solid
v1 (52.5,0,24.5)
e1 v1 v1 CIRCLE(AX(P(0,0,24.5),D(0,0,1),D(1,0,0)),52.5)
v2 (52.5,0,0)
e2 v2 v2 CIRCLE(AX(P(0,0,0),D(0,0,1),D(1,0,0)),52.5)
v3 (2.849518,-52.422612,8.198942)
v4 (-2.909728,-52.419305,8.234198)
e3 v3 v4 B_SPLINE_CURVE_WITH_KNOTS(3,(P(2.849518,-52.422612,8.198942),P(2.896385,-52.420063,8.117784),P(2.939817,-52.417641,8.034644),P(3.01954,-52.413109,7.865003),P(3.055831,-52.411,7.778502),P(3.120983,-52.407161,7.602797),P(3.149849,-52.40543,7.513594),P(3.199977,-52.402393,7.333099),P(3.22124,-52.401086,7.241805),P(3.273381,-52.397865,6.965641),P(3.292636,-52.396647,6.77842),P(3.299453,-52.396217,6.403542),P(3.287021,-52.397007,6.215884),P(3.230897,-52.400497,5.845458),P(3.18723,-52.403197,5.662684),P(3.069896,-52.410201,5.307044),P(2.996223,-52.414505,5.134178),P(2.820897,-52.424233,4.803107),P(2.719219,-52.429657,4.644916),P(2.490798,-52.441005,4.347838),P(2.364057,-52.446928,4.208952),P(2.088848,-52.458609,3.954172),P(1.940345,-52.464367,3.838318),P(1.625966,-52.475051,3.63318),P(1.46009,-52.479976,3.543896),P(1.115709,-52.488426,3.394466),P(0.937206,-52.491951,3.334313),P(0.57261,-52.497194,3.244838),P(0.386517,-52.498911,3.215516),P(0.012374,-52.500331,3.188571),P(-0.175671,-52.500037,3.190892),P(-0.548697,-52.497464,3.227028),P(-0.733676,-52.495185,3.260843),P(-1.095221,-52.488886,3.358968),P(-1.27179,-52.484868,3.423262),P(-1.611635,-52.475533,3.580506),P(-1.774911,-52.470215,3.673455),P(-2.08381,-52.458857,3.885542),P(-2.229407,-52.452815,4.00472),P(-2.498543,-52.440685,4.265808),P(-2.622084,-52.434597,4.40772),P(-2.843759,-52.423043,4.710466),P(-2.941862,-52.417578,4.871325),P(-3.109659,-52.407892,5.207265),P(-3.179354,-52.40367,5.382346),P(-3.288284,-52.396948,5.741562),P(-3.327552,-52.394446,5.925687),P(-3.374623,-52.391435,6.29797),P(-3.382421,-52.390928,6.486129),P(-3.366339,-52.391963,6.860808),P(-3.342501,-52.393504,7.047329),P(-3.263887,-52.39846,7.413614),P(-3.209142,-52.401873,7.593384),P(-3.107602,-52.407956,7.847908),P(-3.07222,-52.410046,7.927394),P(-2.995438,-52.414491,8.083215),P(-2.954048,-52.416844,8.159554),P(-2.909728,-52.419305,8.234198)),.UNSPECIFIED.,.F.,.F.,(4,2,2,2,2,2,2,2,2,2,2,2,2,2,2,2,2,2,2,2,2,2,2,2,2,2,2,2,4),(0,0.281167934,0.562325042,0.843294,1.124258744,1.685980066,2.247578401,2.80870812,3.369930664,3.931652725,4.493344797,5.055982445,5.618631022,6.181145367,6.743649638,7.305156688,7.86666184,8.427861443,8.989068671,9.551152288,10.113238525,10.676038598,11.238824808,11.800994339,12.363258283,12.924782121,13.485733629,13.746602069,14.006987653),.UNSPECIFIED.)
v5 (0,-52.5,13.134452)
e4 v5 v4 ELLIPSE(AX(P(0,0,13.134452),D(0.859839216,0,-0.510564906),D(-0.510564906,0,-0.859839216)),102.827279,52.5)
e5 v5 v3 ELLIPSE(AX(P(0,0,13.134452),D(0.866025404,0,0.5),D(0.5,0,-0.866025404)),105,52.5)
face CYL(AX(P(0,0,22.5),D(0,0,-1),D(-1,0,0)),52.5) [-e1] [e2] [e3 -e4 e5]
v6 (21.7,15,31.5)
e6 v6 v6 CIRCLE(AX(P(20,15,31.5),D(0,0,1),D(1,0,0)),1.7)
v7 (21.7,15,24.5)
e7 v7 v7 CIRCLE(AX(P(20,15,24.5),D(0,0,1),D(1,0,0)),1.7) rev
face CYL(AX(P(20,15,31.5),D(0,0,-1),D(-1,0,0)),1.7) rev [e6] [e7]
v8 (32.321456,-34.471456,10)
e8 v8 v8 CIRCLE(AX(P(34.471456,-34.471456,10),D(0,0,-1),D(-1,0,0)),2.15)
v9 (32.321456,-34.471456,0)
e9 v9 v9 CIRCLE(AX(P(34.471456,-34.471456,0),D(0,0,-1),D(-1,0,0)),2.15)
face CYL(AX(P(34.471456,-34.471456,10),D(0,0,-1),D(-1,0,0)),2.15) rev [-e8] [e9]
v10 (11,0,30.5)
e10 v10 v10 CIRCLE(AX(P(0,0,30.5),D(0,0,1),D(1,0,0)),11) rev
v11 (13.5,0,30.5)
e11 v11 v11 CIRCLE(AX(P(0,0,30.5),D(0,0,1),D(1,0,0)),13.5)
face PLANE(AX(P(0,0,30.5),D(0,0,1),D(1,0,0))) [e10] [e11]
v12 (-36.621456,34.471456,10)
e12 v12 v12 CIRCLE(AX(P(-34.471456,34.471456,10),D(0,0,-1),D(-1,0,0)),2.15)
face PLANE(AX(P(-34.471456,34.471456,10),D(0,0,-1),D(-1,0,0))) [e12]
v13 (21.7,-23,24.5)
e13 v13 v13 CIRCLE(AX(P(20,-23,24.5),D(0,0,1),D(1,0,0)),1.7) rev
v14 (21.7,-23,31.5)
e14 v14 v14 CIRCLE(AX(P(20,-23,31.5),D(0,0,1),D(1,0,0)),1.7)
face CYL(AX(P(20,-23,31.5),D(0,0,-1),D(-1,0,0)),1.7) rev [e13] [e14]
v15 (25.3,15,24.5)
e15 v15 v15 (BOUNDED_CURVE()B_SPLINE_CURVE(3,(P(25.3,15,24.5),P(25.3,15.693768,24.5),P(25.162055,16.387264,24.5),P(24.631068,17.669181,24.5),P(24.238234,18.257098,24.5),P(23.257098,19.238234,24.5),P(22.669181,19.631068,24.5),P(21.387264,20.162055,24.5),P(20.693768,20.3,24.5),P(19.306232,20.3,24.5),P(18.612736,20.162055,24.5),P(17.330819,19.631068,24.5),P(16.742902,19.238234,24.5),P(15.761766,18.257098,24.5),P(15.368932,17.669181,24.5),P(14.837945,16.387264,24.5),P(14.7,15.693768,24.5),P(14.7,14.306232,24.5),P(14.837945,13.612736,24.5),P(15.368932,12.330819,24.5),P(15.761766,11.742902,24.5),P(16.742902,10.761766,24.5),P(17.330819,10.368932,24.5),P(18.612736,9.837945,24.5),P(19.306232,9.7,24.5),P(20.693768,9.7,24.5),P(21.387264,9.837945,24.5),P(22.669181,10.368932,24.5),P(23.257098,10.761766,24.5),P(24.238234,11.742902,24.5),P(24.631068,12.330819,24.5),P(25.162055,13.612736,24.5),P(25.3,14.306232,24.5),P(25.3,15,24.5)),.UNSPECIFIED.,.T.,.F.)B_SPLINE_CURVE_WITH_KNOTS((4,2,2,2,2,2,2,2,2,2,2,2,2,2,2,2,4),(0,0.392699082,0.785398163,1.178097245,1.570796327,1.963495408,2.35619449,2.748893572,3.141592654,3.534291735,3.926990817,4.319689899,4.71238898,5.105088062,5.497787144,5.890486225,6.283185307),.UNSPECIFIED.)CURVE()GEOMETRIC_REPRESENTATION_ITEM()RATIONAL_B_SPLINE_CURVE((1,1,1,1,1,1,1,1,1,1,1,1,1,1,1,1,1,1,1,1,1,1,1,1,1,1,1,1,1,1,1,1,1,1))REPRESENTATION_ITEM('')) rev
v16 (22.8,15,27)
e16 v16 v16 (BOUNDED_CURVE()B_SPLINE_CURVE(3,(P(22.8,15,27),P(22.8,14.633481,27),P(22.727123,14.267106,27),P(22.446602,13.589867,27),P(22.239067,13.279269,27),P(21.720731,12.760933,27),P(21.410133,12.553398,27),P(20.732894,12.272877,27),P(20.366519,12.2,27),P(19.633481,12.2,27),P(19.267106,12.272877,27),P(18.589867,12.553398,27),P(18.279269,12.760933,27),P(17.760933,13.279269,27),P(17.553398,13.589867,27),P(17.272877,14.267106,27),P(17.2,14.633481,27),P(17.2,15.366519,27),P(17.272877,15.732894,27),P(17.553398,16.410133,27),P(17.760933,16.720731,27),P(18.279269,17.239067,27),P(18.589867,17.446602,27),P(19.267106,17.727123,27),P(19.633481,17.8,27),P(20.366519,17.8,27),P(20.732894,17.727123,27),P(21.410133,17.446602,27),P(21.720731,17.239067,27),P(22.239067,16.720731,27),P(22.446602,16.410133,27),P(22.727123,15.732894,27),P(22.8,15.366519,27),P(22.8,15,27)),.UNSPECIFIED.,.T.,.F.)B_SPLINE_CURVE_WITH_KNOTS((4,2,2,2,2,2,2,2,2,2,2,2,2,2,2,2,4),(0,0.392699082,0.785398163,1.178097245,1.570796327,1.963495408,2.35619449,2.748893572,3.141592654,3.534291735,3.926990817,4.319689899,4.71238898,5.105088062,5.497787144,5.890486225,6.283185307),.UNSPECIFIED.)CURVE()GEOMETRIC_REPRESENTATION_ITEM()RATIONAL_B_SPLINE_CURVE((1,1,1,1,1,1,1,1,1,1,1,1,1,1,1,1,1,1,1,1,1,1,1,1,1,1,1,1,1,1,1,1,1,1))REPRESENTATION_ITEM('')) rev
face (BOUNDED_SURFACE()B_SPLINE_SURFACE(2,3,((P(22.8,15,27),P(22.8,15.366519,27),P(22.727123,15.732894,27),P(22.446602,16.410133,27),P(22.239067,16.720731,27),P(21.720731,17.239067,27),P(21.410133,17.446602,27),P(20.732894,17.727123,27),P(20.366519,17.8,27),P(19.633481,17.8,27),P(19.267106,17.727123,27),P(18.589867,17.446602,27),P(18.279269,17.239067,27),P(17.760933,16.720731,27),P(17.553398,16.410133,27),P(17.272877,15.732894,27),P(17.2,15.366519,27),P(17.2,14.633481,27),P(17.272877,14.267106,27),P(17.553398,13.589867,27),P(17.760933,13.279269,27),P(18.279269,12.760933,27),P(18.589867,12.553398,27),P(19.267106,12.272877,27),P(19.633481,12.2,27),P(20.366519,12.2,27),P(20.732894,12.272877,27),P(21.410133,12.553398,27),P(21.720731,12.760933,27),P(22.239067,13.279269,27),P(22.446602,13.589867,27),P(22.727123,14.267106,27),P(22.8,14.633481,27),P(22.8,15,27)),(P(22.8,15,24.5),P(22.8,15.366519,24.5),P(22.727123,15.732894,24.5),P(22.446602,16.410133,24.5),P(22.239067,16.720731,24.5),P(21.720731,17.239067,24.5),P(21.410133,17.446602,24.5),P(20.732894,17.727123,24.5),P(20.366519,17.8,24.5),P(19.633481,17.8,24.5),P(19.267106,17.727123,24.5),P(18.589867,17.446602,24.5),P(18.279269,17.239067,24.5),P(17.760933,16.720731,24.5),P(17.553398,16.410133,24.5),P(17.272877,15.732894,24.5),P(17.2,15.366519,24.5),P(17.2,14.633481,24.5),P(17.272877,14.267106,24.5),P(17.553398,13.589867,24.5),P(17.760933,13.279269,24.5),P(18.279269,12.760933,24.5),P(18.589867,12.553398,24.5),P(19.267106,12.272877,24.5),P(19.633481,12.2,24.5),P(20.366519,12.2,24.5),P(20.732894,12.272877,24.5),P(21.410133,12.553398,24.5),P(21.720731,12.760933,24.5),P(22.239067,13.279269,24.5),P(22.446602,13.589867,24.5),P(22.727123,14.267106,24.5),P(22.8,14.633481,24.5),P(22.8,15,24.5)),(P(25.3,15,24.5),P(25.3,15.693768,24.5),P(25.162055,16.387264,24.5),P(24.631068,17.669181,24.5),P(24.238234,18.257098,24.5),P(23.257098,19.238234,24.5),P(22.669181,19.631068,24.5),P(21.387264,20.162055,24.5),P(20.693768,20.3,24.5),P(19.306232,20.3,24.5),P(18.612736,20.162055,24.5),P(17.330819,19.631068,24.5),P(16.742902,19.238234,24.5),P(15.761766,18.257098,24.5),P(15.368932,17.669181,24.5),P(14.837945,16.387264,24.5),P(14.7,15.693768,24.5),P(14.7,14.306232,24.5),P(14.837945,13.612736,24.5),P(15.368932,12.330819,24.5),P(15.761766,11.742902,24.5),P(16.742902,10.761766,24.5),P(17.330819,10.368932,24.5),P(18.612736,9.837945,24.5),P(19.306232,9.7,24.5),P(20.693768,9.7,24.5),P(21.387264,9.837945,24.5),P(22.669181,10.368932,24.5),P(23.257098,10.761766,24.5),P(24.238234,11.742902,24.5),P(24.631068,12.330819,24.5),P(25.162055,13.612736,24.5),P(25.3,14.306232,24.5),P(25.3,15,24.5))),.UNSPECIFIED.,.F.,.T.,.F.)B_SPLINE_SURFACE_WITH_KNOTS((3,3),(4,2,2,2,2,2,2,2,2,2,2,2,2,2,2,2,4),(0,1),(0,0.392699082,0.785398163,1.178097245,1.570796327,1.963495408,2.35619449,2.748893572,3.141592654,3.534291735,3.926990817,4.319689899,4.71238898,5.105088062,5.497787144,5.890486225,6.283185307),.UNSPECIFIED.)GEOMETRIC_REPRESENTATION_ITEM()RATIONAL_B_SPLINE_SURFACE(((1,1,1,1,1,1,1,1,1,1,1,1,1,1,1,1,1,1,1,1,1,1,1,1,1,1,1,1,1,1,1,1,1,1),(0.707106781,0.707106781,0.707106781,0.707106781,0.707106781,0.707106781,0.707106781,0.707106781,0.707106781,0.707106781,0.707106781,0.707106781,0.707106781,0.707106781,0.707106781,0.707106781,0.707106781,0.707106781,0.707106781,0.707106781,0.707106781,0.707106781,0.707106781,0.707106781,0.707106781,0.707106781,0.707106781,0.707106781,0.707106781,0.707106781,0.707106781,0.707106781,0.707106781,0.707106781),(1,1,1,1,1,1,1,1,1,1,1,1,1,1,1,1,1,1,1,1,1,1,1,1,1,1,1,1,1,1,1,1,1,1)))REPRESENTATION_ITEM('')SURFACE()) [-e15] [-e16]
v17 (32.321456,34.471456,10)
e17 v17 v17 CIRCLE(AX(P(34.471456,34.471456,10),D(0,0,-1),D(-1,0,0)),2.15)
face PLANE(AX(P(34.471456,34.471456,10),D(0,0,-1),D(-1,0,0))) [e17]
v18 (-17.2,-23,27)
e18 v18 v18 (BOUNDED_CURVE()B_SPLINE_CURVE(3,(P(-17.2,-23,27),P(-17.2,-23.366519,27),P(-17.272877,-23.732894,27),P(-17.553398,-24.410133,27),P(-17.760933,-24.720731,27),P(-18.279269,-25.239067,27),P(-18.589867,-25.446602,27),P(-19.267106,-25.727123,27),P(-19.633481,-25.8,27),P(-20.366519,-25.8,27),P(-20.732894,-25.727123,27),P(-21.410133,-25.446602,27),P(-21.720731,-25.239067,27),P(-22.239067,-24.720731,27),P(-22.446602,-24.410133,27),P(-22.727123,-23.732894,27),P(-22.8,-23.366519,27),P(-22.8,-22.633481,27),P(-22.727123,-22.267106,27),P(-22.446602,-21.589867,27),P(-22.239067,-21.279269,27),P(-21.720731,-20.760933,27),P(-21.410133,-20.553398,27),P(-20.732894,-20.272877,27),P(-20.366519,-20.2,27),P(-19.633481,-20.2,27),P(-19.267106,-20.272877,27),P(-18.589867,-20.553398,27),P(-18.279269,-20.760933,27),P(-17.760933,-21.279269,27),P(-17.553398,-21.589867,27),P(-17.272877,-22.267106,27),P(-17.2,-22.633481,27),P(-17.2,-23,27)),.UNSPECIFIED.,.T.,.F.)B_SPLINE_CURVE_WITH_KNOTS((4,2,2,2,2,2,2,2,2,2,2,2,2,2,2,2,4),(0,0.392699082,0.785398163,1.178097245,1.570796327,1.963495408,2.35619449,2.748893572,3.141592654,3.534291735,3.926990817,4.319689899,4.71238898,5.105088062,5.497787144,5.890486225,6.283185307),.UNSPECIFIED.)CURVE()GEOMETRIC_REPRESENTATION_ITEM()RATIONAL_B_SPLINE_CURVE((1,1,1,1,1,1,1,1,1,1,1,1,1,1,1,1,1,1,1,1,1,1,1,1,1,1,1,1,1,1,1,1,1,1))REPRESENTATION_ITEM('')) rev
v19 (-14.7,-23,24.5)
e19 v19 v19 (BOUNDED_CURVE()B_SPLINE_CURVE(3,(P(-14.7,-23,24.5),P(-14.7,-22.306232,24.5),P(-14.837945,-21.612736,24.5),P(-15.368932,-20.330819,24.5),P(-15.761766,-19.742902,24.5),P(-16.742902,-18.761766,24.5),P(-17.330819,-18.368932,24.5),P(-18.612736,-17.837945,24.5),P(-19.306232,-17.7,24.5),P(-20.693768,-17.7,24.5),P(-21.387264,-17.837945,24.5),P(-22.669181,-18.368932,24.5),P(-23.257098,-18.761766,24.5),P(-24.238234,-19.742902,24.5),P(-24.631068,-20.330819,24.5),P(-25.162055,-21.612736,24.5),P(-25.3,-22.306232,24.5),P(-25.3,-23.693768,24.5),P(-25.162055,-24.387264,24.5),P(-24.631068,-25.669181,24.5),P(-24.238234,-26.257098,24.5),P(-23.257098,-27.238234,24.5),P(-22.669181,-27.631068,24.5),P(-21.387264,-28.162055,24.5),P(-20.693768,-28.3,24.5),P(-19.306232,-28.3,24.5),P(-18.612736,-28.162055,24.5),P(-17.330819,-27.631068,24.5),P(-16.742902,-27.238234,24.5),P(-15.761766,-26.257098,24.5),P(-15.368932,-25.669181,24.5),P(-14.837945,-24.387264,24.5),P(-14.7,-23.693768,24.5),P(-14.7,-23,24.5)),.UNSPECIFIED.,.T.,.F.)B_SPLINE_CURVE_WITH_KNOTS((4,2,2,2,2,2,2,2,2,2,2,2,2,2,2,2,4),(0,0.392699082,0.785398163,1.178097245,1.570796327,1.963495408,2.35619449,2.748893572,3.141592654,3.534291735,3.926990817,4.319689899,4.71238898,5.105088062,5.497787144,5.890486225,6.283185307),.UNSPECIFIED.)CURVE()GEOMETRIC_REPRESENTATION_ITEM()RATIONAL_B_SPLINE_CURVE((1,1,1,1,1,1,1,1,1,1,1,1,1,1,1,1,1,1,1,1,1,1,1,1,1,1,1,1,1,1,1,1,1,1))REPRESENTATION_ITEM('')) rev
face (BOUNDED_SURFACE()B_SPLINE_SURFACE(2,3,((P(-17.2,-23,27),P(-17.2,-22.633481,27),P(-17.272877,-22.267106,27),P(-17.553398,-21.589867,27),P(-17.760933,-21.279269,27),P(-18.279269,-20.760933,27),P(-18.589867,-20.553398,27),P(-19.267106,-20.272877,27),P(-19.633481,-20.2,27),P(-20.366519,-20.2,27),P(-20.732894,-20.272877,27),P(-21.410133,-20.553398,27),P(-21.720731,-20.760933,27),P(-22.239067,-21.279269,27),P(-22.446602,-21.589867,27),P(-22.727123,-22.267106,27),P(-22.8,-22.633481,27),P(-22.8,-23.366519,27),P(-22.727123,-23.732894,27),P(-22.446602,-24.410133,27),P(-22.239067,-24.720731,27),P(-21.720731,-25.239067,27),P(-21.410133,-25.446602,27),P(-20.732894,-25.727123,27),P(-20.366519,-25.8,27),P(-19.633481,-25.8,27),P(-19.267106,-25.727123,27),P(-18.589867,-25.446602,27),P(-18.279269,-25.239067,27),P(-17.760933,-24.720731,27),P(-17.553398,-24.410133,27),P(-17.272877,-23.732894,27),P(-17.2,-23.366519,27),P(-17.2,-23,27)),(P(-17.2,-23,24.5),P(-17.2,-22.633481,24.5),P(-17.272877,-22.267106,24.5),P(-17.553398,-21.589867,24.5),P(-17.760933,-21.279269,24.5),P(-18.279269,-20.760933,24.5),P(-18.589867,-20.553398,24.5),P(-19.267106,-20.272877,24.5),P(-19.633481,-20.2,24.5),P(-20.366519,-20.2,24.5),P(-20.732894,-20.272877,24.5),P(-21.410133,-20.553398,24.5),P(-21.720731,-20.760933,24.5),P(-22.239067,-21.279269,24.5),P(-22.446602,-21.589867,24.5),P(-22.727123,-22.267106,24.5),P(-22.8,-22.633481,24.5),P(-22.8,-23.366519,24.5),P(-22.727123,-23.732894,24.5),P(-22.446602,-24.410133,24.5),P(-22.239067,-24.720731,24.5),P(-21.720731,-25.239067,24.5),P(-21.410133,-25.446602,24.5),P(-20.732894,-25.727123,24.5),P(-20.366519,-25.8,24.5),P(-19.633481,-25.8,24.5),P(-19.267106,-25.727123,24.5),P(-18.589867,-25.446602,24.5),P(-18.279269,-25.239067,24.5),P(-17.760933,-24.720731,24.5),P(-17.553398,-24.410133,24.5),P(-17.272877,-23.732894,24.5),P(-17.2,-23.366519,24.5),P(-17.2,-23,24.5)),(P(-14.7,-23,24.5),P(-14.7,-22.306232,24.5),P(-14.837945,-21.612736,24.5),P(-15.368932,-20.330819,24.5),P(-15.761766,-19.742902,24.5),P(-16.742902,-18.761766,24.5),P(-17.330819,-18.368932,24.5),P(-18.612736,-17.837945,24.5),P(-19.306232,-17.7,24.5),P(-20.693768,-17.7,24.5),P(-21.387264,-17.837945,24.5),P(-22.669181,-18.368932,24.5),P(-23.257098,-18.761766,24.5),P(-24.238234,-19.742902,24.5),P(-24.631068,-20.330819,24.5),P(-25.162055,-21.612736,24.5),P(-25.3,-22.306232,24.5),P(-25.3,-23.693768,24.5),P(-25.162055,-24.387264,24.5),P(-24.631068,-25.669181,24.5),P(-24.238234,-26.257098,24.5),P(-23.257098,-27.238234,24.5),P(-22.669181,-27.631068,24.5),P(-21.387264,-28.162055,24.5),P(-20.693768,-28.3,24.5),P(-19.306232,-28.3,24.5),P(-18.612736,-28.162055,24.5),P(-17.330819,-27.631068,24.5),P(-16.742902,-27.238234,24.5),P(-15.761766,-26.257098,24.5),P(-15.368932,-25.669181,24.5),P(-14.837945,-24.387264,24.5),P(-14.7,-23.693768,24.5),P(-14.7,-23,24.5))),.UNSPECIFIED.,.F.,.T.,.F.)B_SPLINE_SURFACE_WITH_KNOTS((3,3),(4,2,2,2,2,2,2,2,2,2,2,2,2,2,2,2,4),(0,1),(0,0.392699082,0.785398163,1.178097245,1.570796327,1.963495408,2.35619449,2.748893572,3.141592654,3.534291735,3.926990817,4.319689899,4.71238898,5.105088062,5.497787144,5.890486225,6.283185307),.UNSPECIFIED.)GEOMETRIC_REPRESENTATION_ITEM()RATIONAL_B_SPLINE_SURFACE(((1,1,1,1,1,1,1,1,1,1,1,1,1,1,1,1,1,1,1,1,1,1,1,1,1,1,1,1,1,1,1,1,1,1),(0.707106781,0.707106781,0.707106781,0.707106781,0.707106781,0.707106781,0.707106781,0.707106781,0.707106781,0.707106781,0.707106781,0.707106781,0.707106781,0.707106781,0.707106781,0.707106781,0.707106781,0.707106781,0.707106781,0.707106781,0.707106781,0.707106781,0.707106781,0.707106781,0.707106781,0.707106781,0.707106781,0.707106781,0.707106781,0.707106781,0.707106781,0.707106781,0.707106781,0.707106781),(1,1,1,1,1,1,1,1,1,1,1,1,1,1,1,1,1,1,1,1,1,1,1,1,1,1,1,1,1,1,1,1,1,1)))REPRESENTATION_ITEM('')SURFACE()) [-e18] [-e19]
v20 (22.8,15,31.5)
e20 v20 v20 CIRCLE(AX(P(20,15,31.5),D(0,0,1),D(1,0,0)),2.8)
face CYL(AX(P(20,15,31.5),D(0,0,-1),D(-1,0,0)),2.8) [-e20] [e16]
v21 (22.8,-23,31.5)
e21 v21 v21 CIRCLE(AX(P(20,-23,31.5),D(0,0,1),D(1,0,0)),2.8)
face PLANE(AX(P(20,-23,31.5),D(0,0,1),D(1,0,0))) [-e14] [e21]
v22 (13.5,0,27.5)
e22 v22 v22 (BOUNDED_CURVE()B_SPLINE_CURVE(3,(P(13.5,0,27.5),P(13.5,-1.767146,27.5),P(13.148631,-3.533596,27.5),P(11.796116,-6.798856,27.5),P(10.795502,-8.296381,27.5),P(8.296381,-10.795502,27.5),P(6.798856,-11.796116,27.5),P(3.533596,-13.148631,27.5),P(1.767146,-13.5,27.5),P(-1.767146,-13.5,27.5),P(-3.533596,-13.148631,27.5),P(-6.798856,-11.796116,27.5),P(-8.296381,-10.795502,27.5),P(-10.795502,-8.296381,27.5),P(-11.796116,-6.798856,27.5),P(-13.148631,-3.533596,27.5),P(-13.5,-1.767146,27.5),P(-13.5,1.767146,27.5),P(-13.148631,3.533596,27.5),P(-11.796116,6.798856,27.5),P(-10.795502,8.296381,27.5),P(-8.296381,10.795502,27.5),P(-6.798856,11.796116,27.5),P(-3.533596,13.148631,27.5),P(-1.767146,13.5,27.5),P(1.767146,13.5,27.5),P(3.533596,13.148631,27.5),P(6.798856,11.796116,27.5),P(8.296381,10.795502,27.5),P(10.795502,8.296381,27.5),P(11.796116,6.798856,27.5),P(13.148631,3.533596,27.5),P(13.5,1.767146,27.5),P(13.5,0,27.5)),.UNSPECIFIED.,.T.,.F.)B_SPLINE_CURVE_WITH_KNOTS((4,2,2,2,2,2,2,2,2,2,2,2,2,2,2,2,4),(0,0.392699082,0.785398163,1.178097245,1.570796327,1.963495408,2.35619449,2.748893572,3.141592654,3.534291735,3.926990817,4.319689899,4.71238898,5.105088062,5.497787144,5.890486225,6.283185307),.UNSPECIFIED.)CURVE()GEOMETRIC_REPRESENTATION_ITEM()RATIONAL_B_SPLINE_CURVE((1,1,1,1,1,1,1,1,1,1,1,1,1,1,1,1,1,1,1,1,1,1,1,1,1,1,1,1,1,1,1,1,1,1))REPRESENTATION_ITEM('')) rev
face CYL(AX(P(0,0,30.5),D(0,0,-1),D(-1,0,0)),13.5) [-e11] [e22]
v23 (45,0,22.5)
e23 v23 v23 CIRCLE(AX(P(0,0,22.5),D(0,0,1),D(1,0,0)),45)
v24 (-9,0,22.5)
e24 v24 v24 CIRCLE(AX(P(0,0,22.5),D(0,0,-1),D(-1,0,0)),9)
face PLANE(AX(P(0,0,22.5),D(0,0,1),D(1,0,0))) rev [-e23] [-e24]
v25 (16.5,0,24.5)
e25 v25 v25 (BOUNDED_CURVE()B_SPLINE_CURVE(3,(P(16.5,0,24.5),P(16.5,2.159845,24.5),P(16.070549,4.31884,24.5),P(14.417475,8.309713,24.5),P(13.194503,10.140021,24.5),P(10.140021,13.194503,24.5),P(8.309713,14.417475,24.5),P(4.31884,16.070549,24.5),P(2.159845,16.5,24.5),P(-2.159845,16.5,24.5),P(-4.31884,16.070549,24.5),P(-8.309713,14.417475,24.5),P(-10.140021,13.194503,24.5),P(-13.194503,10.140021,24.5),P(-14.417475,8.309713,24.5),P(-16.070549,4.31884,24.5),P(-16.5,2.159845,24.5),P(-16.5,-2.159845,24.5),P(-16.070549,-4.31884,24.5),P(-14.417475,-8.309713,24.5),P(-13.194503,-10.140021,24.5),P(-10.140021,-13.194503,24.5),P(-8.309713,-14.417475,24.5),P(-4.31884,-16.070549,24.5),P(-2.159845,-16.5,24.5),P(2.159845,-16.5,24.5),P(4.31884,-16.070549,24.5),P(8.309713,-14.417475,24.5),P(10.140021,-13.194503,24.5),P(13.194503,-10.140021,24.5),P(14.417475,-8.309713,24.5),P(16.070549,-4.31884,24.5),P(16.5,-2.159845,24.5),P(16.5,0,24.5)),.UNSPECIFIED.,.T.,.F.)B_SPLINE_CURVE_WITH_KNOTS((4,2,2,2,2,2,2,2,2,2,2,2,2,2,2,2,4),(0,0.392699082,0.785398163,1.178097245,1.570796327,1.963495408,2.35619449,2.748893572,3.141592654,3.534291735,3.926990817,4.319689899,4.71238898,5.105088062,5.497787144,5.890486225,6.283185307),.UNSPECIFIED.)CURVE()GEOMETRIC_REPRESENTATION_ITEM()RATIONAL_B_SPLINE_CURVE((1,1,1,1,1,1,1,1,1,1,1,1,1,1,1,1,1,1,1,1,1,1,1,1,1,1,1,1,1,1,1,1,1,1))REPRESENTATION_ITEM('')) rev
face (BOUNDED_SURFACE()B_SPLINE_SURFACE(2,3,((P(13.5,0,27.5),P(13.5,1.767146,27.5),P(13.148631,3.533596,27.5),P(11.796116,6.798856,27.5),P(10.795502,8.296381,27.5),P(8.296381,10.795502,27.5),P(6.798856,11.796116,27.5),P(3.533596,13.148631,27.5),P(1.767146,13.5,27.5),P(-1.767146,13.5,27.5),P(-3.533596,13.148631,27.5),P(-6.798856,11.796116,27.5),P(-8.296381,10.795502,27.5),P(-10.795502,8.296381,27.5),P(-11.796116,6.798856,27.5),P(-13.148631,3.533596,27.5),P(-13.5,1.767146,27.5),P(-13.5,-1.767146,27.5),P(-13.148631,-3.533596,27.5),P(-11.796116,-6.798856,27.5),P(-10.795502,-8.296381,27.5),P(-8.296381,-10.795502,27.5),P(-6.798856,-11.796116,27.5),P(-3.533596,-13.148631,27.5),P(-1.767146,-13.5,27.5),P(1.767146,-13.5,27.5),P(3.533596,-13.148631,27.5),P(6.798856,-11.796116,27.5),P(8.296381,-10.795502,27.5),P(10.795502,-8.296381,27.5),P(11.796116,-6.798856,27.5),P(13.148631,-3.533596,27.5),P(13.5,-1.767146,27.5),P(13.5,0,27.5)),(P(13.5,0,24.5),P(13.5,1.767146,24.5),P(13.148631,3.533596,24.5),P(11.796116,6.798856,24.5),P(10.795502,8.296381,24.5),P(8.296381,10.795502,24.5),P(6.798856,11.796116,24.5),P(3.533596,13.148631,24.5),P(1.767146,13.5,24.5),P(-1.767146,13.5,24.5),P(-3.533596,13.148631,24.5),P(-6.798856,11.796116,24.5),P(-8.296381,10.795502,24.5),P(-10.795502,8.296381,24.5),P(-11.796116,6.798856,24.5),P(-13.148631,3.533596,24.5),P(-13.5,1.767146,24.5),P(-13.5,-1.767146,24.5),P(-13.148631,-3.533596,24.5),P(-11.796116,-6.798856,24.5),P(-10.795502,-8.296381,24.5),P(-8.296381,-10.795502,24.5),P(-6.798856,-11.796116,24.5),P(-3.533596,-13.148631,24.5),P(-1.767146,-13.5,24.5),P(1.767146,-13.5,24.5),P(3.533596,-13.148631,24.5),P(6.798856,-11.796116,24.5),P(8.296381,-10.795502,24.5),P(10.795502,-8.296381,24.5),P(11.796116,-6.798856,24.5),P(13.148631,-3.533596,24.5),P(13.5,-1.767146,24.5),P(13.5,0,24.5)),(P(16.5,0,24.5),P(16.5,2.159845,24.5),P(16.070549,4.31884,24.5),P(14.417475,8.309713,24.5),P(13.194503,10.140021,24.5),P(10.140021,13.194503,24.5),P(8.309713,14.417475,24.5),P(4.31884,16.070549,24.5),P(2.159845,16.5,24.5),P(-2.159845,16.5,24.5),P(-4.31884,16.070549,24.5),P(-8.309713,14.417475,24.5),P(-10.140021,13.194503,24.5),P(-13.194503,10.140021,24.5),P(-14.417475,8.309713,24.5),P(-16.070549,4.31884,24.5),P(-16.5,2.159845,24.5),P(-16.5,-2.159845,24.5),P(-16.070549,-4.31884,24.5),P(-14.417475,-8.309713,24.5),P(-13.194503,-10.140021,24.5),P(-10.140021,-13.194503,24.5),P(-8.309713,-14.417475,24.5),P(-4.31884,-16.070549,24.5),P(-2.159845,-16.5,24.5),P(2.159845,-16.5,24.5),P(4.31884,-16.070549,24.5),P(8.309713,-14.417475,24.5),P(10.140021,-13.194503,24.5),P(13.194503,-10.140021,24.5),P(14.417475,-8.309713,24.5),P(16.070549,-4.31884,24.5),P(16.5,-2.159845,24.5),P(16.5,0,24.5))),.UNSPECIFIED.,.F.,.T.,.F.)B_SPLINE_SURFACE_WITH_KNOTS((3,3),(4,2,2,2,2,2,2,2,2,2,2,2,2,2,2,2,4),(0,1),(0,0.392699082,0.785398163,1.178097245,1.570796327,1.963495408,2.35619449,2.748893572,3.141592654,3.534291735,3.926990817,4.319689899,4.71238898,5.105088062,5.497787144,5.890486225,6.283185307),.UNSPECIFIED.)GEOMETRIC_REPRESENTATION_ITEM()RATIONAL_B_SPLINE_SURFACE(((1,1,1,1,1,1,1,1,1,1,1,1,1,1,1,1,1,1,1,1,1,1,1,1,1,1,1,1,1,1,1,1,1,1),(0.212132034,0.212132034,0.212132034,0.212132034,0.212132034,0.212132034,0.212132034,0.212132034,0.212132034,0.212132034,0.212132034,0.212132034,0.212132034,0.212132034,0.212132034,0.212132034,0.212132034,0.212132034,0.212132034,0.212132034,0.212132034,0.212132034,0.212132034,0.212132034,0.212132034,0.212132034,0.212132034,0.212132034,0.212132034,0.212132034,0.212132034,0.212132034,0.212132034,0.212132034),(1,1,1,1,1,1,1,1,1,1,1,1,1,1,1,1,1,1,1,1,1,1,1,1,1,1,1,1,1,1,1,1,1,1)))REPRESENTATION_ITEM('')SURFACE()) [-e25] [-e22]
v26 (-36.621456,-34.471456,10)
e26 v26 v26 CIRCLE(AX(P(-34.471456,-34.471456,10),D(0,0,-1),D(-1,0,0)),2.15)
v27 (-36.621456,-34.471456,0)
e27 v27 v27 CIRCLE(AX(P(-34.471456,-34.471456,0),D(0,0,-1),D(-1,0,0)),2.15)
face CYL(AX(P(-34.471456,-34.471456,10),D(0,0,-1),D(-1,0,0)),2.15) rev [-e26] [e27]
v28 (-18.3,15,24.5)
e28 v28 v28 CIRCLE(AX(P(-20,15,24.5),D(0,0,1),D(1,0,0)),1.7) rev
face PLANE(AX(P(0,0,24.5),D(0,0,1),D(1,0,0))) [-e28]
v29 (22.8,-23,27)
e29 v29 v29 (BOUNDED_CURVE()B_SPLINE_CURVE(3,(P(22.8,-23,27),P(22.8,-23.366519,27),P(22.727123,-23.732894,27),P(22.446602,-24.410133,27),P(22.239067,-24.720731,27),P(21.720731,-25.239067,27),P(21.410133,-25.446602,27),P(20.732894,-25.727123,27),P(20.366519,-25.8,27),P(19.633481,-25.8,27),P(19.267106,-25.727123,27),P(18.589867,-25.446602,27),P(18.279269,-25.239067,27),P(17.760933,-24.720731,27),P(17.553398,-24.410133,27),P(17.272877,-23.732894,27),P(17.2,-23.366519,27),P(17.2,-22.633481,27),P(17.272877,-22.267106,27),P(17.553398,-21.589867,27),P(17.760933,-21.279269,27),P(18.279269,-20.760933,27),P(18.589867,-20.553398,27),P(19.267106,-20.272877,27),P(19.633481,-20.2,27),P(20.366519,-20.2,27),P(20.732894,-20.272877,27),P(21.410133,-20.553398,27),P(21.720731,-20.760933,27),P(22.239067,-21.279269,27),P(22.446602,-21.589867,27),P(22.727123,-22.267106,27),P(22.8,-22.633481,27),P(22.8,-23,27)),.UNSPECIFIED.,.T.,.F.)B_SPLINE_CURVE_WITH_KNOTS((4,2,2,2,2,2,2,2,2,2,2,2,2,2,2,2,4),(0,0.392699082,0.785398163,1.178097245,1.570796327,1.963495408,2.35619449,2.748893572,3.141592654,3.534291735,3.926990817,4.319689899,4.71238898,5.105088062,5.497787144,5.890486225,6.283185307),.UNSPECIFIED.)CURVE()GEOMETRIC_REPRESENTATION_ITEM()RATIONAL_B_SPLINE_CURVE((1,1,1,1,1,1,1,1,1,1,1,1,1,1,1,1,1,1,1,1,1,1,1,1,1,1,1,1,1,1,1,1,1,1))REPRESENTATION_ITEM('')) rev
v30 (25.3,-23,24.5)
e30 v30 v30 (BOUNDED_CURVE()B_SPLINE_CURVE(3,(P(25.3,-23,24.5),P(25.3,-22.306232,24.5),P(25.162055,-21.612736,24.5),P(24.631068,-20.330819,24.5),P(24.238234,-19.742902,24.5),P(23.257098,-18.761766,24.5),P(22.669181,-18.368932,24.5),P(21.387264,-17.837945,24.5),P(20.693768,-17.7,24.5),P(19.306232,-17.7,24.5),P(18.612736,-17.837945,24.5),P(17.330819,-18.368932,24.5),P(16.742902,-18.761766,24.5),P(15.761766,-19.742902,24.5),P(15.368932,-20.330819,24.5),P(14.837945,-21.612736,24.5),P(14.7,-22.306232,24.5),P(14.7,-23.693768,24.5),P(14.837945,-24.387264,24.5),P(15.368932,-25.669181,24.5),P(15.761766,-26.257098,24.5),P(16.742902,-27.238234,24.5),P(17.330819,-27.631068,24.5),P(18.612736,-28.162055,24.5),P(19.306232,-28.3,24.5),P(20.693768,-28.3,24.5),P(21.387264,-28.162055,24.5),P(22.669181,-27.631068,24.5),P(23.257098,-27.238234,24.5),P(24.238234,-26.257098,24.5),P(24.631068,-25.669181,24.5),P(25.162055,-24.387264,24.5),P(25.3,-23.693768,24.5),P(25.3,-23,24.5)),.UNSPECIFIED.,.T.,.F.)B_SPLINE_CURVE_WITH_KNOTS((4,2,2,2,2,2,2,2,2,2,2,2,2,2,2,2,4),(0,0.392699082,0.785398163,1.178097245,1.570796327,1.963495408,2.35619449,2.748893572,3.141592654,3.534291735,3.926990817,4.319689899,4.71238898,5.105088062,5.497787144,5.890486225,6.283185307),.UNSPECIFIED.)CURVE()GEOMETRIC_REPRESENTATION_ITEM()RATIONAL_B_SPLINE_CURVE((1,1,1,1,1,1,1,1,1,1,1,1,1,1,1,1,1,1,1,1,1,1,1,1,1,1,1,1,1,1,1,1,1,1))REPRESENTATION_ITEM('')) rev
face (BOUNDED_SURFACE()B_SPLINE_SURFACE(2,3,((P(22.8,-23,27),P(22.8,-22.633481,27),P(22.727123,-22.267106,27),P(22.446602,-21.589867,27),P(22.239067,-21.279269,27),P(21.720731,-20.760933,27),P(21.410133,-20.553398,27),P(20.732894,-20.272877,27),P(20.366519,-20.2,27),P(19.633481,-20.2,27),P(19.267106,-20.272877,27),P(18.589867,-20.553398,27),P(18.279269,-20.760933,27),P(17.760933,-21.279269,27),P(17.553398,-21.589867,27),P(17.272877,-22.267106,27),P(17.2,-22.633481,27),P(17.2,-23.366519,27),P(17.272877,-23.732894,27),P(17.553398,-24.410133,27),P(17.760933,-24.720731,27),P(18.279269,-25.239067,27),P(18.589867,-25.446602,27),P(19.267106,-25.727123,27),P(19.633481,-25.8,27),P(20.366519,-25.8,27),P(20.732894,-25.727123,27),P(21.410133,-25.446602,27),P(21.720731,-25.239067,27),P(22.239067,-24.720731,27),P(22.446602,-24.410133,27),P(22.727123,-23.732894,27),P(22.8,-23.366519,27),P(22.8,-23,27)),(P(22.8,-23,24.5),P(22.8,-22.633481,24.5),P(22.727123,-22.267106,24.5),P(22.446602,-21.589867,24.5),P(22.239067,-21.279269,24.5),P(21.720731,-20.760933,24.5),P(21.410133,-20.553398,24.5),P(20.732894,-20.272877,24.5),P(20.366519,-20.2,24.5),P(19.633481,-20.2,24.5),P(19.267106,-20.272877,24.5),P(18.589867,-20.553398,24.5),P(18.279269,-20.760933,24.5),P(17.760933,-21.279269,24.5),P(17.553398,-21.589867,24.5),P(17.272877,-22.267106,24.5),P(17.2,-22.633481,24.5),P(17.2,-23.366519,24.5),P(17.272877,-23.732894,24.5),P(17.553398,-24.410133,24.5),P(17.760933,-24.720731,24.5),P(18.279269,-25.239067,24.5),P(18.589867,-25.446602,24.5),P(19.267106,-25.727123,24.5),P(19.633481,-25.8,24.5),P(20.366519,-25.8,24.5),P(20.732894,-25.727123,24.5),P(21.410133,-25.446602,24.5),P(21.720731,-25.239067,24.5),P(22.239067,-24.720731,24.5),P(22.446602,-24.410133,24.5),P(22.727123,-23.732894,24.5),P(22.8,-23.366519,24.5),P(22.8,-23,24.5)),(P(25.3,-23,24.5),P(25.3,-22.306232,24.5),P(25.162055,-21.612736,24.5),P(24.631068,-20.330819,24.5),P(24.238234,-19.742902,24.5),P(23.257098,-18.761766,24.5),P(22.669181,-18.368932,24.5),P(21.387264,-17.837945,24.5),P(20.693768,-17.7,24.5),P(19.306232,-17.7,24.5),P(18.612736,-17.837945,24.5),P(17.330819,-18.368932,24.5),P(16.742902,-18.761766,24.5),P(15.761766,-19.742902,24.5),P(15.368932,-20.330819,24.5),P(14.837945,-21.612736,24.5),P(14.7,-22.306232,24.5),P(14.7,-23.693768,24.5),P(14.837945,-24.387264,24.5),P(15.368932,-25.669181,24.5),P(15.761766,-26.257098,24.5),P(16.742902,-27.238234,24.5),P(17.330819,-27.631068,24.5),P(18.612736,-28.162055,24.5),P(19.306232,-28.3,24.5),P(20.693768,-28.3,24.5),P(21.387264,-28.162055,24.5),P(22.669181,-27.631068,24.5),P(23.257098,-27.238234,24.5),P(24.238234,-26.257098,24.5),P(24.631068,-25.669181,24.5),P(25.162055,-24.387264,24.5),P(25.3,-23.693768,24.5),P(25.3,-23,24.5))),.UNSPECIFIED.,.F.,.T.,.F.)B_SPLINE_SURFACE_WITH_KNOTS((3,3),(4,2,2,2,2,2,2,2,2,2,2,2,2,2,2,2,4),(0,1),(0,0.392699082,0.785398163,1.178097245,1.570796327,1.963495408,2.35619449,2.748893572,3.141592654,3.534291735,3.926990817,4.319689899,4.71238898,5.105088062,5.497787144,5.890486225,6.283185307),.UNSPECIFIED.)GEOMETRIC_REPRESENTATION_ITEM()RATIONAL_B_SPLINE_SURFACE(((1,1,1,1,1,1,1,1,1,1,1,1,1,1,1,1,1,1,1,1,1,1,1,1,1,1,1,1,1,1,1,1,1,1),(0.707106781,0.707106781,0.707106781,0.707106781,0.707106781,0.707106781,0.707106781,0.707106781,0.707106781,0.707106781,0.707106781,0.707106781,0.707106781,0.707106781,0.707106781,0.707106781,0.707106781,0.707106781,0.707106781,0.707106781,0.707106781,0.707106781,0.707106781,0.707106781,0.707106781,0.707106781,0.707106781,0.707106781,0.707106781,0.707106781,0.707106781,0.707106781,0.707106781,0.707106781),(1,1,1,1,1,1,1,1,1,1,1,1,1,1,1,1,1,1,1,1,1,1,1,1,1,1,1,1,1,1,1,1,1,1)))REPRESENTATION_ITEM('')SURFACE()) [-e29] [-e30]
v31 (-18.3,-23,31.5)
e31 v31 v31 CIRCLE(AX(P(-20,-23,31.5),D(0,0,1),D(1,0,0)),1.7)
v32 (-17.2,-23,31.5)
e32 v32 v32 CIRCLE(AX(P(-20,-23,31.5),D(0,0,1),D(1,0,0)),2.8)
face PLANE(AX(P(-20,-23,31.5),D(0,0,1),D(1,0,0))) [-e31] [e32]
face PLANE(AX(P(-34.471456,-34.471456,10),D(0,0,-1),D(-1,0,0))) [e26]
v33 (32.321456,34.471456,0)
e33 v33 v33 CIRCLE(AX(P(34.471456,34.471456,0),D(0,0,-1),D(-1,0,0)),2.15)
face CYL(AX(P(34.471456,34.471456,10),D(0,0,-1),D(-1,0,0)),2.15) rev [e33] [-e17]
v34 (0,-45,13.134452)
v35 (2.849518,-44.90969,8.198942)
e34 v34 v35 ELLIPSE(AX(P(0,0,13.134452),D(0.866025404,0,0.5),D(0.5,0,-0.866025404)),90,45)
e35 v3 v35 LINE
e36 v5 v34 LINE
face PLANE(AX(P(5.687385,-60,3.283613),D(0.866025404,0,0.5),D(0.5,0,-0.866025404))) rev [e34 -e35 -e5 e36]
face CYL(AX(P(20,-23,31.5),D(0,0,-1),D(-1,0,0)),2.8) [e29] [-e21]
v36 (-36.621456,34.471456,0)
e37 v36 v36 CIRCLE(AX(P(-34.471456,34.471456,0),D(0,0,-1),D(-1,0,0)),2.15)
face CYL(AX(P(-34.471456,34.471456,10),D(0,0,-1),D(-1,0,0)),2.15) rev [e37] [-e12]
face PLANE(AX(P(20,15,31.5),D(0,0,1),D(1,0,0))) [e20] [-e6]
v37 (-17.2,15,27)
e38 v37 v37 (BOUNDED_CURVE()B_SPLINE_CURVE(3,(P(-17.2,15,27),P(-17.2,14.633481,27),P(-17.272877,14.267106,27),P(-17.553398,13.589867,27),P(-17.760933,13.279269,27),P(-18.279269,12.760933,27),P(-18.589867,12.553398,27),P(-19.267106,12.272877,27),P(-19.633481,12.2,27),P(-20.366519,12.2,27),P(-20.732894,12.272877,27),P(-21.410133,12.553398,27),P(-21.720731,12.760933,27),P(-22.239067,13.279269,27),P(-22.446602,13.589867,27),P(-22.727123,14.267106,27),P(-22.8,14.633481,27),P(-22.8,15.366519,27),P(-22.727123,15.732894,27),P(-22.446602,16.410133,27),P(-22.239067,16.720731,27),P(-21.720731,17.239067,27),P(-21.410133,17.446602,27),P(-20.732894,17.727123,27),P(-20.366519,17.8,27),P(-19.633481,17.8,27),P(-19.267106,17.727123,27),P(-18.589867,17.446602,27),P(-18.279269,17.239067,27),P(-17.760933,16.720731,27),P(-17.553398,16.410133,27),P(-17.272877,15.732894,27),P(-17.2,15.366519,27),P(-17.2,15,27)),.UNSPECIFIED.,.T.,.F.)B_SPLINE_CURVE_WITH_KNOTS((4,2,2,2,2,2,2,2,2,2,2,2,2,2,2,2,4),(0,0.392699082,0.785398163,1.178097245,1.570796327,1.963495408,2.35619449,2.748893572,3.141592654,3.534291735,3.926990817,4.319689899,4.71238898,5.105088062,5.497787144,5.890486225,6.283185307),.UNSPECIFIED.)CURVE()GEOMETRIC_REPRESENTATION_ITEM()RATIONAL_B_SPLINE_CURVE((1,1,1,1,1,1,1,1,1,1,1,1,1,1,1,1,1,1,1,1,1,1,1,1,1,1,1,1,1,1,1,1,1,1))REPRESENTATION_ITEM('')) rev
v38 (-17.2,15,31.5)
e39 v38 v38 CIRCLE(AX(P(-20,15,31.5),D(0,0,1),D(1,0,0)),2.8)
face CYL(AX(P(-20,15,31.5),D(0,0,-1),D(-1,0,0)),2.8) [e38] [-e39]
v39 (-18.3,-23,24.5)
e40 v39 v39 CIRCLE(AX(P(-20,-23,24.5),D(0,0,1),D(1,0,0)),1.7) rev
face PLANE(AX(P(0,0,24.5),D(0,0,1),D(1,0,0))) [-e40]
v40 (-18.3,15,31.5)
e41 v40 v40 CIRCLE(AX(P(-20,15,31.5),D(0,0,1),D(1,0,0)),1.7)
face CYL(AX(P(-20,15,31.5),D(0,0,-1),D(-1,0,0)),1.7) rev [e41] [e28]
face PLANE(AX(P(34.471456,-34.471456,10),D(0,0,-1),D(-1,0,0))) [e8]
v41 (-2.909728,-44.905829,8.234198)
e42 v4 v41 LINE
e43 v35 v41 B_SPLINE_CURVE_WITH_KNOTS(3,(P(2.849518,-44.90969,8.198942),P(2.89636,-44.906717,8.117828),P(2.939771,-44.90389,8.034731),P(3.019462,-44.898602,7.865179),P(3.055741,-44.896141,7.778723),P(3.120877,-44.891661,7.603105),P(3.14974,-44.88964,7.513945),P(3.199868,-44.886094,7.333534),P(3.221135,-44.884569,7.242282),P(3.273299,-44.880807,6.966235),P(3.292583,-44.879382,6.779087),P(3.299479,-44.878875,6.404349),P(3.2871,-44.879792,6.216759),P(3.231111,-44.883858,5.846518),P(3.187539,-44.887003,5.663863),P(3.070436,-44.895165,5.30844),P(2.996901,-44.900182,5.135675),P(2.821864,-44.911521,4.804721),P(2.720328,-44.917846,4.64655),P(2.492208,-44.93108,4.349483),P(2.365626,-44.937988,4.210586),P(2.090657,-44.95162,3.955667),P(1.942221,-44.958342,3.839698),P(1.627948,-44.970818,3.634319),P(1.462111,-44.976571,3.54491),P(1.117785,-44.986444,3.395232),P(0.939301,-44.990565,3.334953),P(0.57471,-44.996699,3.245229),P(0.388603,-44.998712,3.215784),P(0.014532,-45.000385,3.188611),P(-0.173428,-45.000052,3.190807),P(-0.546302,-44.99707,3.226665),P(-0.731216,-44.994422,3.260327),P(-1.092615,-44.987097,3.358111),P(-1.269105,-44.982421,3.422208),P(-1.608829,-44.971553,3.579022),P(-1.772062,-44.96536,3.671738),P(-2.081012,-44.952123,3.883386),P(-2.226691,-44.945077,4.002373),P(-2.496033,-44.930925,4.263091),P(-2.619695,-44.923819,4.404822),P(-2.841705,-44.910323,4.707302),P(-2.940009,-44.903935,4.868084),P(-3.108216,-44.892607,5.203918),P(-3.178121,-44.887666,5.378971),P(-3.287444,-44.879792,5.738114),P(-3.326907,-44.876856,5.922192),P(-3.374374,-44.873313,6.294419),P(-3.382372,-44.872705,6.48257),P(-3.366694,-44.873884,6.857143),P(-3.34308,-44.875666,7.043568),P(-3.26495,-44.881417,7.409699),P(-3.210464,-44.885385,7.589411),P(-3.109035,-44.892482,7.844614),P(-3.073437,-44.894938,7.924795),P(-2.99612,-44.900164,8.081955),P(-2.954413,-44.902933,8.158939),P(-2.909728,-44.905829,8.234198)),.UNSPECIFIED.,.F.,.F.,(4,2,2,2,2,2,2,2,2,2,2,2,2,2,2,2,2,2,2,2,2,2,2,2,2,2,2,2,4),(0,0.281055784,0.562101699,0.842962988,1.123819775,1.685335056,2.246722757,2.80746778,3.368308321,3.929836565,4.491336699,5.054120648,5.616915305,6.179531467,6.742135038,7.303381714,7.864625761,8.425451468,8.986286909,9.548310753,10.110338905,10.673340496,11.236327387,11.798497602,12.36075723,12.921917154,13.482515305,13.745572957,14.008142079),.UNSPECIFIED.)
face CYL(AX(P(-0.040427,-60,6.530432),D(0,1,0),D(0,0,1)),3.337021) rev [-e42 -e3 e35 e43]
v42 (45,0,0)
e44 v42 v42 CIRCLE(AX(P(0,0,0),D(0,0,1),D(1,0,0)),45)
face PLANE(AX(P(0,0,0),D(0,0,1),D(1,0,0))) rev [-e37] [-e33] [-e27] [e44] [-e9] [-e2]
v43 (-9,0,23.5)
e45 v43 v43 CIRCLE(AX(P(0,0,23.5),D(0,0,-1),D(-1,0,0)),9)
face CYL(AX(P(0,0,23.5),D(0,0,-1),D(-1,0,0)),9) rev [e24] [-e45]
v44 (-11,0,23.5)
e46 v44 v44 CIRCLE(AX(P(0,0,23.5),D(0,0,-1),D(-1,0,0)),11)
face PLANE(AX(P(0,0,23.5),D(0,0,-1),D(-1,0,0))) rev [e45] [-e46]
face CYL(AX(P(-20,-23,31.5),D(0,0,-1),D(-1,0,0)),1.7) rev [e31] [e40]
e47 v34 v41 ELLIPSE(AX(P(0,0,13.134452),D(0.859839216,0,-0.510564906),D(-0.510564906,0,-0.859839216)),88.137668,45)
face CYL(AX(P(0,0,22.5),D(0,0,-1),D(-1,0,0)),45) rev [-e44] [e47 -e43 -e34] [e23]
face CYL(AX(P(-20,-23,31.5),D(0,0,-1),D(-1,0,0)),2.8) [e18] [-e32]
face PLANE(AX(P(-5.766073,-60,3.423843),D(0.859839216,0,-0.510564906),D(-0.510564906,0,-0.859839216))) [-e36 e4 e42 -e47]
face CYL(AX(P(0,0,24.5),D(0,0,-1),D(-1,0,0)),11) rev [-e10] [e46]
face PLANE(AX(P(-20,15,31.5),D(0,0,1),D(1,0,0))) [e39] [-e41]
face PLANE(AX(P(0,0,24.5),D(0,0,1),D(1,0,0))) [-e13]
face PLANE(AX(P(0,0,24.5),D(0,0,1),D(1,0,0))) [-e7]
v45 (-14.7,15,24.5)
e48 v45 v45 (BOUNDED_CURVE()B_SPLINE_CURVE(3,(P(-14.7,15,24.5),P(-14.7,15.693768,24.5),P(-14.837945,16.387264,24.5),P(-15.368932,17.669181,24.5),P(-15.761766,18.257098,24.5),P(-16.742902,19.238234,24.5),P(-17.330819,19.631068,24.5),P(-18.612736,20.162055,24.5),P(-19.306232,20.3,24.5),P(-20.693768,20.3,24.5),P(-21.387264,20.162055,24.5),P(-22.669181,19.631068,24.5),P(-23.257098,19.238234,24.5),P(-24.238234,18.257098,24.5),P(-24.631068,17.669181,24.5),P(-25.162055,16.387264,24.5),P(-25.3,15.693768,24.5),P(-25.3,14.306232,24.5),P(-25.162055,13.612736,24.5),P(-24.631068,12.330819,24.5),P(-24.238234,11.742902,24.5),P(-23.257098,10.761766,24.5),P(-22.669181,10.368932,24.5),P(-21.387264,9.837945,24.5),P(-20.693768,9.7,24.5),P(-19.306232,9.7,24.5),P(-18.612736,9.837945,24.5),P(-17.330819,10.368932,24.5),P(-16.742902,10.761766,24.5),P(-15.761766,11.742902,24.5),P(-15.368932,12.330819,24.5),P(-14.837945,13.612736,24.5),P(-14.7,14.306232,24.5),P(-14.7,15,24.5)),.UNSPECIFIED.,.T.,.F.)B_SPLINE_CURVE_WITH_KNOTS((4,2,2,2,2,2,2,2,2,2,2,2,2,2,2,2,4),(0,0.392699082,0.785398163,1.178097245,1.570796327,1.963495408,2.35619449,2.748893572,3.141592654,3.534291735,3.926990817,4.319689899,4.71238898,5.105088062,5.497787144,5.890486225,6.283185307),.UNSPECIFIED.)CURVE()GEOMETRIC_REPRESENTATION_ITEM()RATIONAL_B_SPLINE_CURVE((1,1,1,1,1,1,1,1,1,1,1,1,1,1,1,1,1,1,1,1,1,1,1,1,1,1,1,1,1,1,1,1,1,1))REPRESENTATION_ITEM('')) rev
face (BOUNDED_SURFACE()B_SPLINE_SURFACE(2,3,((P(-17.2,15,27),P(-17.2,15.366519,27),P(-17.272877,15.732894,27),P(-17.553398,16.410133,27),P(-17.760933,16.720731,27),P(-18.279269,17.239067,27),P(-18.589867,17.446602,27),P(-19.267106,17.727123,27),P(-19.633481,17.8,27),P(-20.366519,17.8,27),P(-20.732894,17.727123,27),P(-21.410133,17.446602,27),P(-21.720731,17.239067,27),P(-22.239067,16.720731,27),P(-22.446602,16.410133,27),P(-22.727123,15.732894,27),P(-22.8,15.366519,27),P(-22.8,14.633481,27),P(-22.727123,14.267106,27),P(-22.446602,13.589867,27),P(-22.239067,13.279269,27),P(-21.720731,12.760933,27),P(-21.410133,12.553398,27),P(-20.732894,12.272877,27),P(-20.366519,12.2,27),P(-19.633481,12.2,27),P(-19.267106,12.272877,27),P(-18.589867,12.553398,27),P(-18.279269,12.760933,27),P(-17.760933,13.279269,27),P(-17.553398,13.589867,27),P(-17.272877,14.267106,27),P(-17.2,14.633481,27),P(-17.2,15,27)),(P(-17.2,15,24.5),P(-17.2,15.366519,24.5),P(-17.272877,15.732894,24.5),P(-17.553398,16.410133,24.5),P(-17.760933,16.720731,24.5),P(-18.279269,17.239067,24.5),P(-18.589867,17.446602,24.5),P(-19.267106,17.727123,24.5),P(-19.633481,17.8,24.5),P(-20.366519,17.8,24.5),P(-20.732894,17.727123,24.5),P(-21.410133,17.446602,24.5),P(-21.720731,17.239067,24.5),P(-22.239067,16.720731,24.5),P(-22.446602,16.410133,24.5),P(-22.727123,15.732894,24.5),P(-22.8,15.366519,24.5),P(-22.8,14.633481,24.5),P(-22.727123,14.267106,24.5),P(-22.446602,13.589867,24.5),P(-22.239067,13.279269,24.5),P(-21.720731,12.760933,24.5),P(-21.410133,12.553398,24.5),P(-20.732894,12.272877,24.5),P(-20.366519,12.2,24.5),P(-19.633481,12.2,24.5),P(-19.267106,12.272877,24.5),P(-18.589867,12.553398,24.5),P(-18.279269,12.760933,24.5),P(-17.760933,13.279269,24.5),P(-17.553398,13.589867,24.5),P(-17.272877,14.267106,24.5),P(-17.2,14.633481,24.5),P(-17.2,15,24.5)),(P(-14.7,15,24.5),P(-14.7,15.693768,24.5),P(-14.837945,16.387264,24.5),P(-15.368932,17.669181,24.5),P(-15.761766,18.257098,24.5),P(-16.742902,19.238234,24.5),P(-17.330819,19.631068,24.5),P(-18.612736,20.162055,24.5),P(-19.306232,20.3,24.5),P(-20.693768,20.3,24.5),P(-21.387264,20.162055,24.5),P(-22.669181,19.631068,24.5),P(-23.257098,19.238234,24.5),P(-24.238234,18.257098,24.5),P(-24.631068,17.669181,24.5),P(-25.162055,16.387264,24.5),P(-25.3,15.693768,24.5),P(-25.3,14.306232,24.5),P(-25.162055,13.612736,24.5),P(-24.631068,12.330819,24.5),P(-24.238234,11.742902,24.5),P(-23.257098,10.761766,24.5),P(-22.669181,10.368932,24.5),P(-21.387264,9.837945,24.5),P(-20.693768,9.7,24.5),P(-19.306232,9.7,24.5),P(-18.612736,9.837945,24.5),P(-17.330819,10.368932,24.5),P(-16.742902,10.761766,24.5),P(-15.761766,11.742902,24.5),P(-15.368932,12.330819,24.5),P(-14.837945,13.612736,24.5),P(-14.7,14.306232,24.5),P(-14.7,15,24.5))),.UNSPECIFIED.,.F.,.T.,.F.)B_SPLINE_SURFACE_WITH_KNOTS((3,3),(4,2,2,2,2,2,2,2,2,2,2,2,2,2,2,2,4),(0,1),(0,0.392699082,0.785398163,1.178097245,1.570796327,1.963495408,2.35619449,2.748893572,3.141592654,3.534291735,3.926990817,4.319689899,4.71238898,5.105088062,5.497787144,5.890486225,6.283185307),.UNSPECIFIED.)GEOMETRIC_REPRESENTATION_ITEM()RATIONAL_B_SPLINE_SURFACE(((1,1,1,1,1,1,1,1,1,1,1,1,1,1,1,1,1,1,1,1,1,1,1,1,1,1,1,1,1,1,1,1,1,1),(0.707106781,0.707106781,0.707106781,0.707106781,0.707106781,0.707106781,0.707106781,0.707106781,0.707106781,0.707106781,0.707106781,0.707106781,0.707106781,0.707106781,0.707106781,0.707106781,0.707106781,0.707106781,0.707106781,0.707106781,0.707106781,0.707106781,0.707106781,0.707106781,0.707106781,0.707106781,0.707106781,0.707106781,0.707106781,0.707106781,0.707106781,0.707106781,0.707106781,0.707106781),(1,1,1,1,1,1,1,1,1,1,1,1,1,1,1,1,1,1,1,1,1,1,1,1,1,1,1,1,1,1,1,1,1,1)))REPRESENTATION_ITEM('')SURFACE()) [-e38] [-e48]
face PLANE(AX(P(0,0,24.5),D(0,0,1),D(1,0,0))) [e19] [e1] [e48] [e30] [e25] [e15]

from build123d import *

# Parameters (mm, degrees)
SKETCH1_R           = 52.5
SKETCH1_R_2         = 45
BOSS_EXTRUDE1_DEPTH = 22.5
BOSS_EXTRUDE2_START = 22.5
SKETCH1_2_R         = 52.5
SKETCH1_2_R_2       = 11
BOSS_EXTRUDE2_DEPTH = 2
SKETCH3_R           = 2.8
SKETCH3_R_2         = 1.7
BOSS_EXTRUDE3_DEPTH = 7
FILLET1_R           = 2.5
SKETCH4_R           = 13.5
SKETCH4_R_2         = 11
BOSS_EXTRUDE4_DEPTH = 6
SKETCH5_R           = 11
SKETCH5_R_2         = 9
BOSS_EXTRUDE5_DEPTH = 1
SKETCH7_R           = 2.15
CUT_EXTRUDE1_DEPTH  = 10
CUT_EXTRUDE3_START  = -40
CUT_EXTRUDE3_DEPTH  = 20
FILLET2_SIZE        = 3


with BuildPart() as part:
    # Sketch1 → Boss-Extrude1 (new body)
    with BuildSketch(Plane.XY):
        with Locations(Location((0, 0, 0), (0, 0, 180))):
            Circle(SKETCH1_R)
        with Locations(Location((0, 0, 0), (0, 0, 180))):
            Circle(SKETCH1_R_2, mode=Mode.SUBTRACT)
    extrude(amount=BOSS_EXTRUDE1_DEPTH)

    # Sketch1<2> → Boss-Extrude2 (add)
    with BuildSketch(Plane.XY.offset(BOSS_EXTRUDE2_START)):
        with Locations(Location((0, 0, 0), (0, 0, 180))):
            Circle(SKETCH1_2_R)
        Circle(SKETCH1_2_R_2, mode=Mode.SUBTRACT)
    extrude(amount=BOSS_EXTRUDE2_DEPTH)

    # Sketch3 → Boss-Extrude3 (add)
    # profile 1 of 4: a face of its own
    with BuildSketch(Plane.XY.offset(24.5)):
        with Locations((-20, 15)):
            Circle(SKETCH3_R)
        with Locations((-20, 15)):
            Circle(SKETCH3_R_2, mode=Mode.SUBTRACT)
    # profile 2 of 4: a face of its own
    with BuildSketch(Plane.XY.offset(24.5)):
        with Locations((20, 15)):
            Circle(SKETCH3_R)
        with Locations((20, 15)):
            Circle(SKETCH3_R_2, mode=Mode.SUBTRACT)
    # profile 3 of 4: a face of its own
    with BuildSketch(Plane.XY.offset(24.5)):
        with Locations((20, -23)):
            Circle(SKETCH3_R)
        with Locations((20, -23)):
            Circle(SKETCH3_R_2, mode=Mode.SUBTRACT)
    # profile 4 of 4: a face of its own
    with BuildSketch(Plane.XY.offset(24.5)):
        with Locations((-20, -23)):
            Circle(SKETCH3_R)
        with Locations((-20, -23)):
            Circle(SKETCH3_R_2, mode=Mode.SUBTRACT)
    extrude(amount=BOSS_EXTRUDE3_DEPTH)

    # Fillet1
    fillet1_edges = [part.edges().sort_by_distance(p)[0] for p in [
        (-22.8, 15, 24.5),
        (17.2, 15, 24.5),
        (17.2, -23, 24.5),
        (-22.8, -23, 24.5),
    ]]
    fillet(fillet1_edges, radius=FILLET1_R)

    # Sketch4 → Boss-Extrude4 (add)
    with BuildSketch(Plane.XY.offset(24.5)):
        Circle(SKETCH4_R)
        Circle(SKETCH4_R_2, mode=Mode.SUBTRACT)
    extrude(amount=BOSS_EXTRUDE4_DEPTH)

    # Sketch5 → Boss-Extrude5 (add)
    with BuildSketch(Plane(origin=(0, 0, 22.5), x_dir=(-1, 0, 0), z_dir=(0, 0, -1))):
        Circle(SKETCH5_R)
        Circle(SKETCH5_R_2, mode=Mode.SUBTRACT)
    extrude(amount=-BOSS_EXTRUDE5_DEPTH)

    # Sketch7 → Cut-Extrude1 (cut)
    with BuildSketch(Plane(origin=(0, 0, 0), x_dir=(-1, 0, 0), z_dir=(0, 0, -1))):
        with Locations((-34.471455583, 34.471455583)):
            Circle(SKETCH7_R)
        with Locations((34.471455583, 34.471455583)):
            Circle(SKETCH7_R)
        with Locations((34.471455583, -34.471455583)):
            Circle(SKETCH7_R)
        with Locations((-34.471455583, -34.471455583)):
            Circle(SKETCH7_R)
    extrude(amount=-CUT_EXTRUDE1_DEPTH, mode=Mode.SUBTRACT)

    # Sketch8 → Cut-Extrude3 (cut)
    with BuildSketch(Plane(origin=(0, 0, 0), x_dir=(1, 0, 0), z_dir=(0, 1, 0)).offset(CUT_EXTRUDE3_START)):
        with BuildLine():
            Line((0, -13.134452127), (2.84951796, -8.198942243))
            ThreePointArc((2.84951796, -8.198942243), (-0.060853845, -3.193473944), (-2.909727738, -8.234197551))
            Line((-2.909727738, -8.234197551), (0, -13.134452127))
        make_face()
    extrude(amount=-CUT_EXTRUDE3_DEPTH, mode=Mode.SUBTRACT)

    # Fillet2
    # a fillet whose section is not a circle: 3 mm, written as the material it adds along each edge
    with BuildSketch(Plane(origin=(0, 0, 24.5), x_dir=(1, 0, 0), z_dir=(0, -1, 0))) as fillet2_piece_1:
        with BuildLine():
            Bezier((13.5 + FILLET2_SIZE, 0), (13.5, 0), (13.5, FILLET2_SIZE), weights=[1, 0.212132034, 1])
            Line((13.5, FILLET2_SIZE), (13.5, 0))
            Line((13.5, 0), (13.5 + FILLET2_SIZE, 0))
        make_face()
    revolve(axis=Axis((0, 0, 24.5), (0, 0, 1)))


solid = part.part
